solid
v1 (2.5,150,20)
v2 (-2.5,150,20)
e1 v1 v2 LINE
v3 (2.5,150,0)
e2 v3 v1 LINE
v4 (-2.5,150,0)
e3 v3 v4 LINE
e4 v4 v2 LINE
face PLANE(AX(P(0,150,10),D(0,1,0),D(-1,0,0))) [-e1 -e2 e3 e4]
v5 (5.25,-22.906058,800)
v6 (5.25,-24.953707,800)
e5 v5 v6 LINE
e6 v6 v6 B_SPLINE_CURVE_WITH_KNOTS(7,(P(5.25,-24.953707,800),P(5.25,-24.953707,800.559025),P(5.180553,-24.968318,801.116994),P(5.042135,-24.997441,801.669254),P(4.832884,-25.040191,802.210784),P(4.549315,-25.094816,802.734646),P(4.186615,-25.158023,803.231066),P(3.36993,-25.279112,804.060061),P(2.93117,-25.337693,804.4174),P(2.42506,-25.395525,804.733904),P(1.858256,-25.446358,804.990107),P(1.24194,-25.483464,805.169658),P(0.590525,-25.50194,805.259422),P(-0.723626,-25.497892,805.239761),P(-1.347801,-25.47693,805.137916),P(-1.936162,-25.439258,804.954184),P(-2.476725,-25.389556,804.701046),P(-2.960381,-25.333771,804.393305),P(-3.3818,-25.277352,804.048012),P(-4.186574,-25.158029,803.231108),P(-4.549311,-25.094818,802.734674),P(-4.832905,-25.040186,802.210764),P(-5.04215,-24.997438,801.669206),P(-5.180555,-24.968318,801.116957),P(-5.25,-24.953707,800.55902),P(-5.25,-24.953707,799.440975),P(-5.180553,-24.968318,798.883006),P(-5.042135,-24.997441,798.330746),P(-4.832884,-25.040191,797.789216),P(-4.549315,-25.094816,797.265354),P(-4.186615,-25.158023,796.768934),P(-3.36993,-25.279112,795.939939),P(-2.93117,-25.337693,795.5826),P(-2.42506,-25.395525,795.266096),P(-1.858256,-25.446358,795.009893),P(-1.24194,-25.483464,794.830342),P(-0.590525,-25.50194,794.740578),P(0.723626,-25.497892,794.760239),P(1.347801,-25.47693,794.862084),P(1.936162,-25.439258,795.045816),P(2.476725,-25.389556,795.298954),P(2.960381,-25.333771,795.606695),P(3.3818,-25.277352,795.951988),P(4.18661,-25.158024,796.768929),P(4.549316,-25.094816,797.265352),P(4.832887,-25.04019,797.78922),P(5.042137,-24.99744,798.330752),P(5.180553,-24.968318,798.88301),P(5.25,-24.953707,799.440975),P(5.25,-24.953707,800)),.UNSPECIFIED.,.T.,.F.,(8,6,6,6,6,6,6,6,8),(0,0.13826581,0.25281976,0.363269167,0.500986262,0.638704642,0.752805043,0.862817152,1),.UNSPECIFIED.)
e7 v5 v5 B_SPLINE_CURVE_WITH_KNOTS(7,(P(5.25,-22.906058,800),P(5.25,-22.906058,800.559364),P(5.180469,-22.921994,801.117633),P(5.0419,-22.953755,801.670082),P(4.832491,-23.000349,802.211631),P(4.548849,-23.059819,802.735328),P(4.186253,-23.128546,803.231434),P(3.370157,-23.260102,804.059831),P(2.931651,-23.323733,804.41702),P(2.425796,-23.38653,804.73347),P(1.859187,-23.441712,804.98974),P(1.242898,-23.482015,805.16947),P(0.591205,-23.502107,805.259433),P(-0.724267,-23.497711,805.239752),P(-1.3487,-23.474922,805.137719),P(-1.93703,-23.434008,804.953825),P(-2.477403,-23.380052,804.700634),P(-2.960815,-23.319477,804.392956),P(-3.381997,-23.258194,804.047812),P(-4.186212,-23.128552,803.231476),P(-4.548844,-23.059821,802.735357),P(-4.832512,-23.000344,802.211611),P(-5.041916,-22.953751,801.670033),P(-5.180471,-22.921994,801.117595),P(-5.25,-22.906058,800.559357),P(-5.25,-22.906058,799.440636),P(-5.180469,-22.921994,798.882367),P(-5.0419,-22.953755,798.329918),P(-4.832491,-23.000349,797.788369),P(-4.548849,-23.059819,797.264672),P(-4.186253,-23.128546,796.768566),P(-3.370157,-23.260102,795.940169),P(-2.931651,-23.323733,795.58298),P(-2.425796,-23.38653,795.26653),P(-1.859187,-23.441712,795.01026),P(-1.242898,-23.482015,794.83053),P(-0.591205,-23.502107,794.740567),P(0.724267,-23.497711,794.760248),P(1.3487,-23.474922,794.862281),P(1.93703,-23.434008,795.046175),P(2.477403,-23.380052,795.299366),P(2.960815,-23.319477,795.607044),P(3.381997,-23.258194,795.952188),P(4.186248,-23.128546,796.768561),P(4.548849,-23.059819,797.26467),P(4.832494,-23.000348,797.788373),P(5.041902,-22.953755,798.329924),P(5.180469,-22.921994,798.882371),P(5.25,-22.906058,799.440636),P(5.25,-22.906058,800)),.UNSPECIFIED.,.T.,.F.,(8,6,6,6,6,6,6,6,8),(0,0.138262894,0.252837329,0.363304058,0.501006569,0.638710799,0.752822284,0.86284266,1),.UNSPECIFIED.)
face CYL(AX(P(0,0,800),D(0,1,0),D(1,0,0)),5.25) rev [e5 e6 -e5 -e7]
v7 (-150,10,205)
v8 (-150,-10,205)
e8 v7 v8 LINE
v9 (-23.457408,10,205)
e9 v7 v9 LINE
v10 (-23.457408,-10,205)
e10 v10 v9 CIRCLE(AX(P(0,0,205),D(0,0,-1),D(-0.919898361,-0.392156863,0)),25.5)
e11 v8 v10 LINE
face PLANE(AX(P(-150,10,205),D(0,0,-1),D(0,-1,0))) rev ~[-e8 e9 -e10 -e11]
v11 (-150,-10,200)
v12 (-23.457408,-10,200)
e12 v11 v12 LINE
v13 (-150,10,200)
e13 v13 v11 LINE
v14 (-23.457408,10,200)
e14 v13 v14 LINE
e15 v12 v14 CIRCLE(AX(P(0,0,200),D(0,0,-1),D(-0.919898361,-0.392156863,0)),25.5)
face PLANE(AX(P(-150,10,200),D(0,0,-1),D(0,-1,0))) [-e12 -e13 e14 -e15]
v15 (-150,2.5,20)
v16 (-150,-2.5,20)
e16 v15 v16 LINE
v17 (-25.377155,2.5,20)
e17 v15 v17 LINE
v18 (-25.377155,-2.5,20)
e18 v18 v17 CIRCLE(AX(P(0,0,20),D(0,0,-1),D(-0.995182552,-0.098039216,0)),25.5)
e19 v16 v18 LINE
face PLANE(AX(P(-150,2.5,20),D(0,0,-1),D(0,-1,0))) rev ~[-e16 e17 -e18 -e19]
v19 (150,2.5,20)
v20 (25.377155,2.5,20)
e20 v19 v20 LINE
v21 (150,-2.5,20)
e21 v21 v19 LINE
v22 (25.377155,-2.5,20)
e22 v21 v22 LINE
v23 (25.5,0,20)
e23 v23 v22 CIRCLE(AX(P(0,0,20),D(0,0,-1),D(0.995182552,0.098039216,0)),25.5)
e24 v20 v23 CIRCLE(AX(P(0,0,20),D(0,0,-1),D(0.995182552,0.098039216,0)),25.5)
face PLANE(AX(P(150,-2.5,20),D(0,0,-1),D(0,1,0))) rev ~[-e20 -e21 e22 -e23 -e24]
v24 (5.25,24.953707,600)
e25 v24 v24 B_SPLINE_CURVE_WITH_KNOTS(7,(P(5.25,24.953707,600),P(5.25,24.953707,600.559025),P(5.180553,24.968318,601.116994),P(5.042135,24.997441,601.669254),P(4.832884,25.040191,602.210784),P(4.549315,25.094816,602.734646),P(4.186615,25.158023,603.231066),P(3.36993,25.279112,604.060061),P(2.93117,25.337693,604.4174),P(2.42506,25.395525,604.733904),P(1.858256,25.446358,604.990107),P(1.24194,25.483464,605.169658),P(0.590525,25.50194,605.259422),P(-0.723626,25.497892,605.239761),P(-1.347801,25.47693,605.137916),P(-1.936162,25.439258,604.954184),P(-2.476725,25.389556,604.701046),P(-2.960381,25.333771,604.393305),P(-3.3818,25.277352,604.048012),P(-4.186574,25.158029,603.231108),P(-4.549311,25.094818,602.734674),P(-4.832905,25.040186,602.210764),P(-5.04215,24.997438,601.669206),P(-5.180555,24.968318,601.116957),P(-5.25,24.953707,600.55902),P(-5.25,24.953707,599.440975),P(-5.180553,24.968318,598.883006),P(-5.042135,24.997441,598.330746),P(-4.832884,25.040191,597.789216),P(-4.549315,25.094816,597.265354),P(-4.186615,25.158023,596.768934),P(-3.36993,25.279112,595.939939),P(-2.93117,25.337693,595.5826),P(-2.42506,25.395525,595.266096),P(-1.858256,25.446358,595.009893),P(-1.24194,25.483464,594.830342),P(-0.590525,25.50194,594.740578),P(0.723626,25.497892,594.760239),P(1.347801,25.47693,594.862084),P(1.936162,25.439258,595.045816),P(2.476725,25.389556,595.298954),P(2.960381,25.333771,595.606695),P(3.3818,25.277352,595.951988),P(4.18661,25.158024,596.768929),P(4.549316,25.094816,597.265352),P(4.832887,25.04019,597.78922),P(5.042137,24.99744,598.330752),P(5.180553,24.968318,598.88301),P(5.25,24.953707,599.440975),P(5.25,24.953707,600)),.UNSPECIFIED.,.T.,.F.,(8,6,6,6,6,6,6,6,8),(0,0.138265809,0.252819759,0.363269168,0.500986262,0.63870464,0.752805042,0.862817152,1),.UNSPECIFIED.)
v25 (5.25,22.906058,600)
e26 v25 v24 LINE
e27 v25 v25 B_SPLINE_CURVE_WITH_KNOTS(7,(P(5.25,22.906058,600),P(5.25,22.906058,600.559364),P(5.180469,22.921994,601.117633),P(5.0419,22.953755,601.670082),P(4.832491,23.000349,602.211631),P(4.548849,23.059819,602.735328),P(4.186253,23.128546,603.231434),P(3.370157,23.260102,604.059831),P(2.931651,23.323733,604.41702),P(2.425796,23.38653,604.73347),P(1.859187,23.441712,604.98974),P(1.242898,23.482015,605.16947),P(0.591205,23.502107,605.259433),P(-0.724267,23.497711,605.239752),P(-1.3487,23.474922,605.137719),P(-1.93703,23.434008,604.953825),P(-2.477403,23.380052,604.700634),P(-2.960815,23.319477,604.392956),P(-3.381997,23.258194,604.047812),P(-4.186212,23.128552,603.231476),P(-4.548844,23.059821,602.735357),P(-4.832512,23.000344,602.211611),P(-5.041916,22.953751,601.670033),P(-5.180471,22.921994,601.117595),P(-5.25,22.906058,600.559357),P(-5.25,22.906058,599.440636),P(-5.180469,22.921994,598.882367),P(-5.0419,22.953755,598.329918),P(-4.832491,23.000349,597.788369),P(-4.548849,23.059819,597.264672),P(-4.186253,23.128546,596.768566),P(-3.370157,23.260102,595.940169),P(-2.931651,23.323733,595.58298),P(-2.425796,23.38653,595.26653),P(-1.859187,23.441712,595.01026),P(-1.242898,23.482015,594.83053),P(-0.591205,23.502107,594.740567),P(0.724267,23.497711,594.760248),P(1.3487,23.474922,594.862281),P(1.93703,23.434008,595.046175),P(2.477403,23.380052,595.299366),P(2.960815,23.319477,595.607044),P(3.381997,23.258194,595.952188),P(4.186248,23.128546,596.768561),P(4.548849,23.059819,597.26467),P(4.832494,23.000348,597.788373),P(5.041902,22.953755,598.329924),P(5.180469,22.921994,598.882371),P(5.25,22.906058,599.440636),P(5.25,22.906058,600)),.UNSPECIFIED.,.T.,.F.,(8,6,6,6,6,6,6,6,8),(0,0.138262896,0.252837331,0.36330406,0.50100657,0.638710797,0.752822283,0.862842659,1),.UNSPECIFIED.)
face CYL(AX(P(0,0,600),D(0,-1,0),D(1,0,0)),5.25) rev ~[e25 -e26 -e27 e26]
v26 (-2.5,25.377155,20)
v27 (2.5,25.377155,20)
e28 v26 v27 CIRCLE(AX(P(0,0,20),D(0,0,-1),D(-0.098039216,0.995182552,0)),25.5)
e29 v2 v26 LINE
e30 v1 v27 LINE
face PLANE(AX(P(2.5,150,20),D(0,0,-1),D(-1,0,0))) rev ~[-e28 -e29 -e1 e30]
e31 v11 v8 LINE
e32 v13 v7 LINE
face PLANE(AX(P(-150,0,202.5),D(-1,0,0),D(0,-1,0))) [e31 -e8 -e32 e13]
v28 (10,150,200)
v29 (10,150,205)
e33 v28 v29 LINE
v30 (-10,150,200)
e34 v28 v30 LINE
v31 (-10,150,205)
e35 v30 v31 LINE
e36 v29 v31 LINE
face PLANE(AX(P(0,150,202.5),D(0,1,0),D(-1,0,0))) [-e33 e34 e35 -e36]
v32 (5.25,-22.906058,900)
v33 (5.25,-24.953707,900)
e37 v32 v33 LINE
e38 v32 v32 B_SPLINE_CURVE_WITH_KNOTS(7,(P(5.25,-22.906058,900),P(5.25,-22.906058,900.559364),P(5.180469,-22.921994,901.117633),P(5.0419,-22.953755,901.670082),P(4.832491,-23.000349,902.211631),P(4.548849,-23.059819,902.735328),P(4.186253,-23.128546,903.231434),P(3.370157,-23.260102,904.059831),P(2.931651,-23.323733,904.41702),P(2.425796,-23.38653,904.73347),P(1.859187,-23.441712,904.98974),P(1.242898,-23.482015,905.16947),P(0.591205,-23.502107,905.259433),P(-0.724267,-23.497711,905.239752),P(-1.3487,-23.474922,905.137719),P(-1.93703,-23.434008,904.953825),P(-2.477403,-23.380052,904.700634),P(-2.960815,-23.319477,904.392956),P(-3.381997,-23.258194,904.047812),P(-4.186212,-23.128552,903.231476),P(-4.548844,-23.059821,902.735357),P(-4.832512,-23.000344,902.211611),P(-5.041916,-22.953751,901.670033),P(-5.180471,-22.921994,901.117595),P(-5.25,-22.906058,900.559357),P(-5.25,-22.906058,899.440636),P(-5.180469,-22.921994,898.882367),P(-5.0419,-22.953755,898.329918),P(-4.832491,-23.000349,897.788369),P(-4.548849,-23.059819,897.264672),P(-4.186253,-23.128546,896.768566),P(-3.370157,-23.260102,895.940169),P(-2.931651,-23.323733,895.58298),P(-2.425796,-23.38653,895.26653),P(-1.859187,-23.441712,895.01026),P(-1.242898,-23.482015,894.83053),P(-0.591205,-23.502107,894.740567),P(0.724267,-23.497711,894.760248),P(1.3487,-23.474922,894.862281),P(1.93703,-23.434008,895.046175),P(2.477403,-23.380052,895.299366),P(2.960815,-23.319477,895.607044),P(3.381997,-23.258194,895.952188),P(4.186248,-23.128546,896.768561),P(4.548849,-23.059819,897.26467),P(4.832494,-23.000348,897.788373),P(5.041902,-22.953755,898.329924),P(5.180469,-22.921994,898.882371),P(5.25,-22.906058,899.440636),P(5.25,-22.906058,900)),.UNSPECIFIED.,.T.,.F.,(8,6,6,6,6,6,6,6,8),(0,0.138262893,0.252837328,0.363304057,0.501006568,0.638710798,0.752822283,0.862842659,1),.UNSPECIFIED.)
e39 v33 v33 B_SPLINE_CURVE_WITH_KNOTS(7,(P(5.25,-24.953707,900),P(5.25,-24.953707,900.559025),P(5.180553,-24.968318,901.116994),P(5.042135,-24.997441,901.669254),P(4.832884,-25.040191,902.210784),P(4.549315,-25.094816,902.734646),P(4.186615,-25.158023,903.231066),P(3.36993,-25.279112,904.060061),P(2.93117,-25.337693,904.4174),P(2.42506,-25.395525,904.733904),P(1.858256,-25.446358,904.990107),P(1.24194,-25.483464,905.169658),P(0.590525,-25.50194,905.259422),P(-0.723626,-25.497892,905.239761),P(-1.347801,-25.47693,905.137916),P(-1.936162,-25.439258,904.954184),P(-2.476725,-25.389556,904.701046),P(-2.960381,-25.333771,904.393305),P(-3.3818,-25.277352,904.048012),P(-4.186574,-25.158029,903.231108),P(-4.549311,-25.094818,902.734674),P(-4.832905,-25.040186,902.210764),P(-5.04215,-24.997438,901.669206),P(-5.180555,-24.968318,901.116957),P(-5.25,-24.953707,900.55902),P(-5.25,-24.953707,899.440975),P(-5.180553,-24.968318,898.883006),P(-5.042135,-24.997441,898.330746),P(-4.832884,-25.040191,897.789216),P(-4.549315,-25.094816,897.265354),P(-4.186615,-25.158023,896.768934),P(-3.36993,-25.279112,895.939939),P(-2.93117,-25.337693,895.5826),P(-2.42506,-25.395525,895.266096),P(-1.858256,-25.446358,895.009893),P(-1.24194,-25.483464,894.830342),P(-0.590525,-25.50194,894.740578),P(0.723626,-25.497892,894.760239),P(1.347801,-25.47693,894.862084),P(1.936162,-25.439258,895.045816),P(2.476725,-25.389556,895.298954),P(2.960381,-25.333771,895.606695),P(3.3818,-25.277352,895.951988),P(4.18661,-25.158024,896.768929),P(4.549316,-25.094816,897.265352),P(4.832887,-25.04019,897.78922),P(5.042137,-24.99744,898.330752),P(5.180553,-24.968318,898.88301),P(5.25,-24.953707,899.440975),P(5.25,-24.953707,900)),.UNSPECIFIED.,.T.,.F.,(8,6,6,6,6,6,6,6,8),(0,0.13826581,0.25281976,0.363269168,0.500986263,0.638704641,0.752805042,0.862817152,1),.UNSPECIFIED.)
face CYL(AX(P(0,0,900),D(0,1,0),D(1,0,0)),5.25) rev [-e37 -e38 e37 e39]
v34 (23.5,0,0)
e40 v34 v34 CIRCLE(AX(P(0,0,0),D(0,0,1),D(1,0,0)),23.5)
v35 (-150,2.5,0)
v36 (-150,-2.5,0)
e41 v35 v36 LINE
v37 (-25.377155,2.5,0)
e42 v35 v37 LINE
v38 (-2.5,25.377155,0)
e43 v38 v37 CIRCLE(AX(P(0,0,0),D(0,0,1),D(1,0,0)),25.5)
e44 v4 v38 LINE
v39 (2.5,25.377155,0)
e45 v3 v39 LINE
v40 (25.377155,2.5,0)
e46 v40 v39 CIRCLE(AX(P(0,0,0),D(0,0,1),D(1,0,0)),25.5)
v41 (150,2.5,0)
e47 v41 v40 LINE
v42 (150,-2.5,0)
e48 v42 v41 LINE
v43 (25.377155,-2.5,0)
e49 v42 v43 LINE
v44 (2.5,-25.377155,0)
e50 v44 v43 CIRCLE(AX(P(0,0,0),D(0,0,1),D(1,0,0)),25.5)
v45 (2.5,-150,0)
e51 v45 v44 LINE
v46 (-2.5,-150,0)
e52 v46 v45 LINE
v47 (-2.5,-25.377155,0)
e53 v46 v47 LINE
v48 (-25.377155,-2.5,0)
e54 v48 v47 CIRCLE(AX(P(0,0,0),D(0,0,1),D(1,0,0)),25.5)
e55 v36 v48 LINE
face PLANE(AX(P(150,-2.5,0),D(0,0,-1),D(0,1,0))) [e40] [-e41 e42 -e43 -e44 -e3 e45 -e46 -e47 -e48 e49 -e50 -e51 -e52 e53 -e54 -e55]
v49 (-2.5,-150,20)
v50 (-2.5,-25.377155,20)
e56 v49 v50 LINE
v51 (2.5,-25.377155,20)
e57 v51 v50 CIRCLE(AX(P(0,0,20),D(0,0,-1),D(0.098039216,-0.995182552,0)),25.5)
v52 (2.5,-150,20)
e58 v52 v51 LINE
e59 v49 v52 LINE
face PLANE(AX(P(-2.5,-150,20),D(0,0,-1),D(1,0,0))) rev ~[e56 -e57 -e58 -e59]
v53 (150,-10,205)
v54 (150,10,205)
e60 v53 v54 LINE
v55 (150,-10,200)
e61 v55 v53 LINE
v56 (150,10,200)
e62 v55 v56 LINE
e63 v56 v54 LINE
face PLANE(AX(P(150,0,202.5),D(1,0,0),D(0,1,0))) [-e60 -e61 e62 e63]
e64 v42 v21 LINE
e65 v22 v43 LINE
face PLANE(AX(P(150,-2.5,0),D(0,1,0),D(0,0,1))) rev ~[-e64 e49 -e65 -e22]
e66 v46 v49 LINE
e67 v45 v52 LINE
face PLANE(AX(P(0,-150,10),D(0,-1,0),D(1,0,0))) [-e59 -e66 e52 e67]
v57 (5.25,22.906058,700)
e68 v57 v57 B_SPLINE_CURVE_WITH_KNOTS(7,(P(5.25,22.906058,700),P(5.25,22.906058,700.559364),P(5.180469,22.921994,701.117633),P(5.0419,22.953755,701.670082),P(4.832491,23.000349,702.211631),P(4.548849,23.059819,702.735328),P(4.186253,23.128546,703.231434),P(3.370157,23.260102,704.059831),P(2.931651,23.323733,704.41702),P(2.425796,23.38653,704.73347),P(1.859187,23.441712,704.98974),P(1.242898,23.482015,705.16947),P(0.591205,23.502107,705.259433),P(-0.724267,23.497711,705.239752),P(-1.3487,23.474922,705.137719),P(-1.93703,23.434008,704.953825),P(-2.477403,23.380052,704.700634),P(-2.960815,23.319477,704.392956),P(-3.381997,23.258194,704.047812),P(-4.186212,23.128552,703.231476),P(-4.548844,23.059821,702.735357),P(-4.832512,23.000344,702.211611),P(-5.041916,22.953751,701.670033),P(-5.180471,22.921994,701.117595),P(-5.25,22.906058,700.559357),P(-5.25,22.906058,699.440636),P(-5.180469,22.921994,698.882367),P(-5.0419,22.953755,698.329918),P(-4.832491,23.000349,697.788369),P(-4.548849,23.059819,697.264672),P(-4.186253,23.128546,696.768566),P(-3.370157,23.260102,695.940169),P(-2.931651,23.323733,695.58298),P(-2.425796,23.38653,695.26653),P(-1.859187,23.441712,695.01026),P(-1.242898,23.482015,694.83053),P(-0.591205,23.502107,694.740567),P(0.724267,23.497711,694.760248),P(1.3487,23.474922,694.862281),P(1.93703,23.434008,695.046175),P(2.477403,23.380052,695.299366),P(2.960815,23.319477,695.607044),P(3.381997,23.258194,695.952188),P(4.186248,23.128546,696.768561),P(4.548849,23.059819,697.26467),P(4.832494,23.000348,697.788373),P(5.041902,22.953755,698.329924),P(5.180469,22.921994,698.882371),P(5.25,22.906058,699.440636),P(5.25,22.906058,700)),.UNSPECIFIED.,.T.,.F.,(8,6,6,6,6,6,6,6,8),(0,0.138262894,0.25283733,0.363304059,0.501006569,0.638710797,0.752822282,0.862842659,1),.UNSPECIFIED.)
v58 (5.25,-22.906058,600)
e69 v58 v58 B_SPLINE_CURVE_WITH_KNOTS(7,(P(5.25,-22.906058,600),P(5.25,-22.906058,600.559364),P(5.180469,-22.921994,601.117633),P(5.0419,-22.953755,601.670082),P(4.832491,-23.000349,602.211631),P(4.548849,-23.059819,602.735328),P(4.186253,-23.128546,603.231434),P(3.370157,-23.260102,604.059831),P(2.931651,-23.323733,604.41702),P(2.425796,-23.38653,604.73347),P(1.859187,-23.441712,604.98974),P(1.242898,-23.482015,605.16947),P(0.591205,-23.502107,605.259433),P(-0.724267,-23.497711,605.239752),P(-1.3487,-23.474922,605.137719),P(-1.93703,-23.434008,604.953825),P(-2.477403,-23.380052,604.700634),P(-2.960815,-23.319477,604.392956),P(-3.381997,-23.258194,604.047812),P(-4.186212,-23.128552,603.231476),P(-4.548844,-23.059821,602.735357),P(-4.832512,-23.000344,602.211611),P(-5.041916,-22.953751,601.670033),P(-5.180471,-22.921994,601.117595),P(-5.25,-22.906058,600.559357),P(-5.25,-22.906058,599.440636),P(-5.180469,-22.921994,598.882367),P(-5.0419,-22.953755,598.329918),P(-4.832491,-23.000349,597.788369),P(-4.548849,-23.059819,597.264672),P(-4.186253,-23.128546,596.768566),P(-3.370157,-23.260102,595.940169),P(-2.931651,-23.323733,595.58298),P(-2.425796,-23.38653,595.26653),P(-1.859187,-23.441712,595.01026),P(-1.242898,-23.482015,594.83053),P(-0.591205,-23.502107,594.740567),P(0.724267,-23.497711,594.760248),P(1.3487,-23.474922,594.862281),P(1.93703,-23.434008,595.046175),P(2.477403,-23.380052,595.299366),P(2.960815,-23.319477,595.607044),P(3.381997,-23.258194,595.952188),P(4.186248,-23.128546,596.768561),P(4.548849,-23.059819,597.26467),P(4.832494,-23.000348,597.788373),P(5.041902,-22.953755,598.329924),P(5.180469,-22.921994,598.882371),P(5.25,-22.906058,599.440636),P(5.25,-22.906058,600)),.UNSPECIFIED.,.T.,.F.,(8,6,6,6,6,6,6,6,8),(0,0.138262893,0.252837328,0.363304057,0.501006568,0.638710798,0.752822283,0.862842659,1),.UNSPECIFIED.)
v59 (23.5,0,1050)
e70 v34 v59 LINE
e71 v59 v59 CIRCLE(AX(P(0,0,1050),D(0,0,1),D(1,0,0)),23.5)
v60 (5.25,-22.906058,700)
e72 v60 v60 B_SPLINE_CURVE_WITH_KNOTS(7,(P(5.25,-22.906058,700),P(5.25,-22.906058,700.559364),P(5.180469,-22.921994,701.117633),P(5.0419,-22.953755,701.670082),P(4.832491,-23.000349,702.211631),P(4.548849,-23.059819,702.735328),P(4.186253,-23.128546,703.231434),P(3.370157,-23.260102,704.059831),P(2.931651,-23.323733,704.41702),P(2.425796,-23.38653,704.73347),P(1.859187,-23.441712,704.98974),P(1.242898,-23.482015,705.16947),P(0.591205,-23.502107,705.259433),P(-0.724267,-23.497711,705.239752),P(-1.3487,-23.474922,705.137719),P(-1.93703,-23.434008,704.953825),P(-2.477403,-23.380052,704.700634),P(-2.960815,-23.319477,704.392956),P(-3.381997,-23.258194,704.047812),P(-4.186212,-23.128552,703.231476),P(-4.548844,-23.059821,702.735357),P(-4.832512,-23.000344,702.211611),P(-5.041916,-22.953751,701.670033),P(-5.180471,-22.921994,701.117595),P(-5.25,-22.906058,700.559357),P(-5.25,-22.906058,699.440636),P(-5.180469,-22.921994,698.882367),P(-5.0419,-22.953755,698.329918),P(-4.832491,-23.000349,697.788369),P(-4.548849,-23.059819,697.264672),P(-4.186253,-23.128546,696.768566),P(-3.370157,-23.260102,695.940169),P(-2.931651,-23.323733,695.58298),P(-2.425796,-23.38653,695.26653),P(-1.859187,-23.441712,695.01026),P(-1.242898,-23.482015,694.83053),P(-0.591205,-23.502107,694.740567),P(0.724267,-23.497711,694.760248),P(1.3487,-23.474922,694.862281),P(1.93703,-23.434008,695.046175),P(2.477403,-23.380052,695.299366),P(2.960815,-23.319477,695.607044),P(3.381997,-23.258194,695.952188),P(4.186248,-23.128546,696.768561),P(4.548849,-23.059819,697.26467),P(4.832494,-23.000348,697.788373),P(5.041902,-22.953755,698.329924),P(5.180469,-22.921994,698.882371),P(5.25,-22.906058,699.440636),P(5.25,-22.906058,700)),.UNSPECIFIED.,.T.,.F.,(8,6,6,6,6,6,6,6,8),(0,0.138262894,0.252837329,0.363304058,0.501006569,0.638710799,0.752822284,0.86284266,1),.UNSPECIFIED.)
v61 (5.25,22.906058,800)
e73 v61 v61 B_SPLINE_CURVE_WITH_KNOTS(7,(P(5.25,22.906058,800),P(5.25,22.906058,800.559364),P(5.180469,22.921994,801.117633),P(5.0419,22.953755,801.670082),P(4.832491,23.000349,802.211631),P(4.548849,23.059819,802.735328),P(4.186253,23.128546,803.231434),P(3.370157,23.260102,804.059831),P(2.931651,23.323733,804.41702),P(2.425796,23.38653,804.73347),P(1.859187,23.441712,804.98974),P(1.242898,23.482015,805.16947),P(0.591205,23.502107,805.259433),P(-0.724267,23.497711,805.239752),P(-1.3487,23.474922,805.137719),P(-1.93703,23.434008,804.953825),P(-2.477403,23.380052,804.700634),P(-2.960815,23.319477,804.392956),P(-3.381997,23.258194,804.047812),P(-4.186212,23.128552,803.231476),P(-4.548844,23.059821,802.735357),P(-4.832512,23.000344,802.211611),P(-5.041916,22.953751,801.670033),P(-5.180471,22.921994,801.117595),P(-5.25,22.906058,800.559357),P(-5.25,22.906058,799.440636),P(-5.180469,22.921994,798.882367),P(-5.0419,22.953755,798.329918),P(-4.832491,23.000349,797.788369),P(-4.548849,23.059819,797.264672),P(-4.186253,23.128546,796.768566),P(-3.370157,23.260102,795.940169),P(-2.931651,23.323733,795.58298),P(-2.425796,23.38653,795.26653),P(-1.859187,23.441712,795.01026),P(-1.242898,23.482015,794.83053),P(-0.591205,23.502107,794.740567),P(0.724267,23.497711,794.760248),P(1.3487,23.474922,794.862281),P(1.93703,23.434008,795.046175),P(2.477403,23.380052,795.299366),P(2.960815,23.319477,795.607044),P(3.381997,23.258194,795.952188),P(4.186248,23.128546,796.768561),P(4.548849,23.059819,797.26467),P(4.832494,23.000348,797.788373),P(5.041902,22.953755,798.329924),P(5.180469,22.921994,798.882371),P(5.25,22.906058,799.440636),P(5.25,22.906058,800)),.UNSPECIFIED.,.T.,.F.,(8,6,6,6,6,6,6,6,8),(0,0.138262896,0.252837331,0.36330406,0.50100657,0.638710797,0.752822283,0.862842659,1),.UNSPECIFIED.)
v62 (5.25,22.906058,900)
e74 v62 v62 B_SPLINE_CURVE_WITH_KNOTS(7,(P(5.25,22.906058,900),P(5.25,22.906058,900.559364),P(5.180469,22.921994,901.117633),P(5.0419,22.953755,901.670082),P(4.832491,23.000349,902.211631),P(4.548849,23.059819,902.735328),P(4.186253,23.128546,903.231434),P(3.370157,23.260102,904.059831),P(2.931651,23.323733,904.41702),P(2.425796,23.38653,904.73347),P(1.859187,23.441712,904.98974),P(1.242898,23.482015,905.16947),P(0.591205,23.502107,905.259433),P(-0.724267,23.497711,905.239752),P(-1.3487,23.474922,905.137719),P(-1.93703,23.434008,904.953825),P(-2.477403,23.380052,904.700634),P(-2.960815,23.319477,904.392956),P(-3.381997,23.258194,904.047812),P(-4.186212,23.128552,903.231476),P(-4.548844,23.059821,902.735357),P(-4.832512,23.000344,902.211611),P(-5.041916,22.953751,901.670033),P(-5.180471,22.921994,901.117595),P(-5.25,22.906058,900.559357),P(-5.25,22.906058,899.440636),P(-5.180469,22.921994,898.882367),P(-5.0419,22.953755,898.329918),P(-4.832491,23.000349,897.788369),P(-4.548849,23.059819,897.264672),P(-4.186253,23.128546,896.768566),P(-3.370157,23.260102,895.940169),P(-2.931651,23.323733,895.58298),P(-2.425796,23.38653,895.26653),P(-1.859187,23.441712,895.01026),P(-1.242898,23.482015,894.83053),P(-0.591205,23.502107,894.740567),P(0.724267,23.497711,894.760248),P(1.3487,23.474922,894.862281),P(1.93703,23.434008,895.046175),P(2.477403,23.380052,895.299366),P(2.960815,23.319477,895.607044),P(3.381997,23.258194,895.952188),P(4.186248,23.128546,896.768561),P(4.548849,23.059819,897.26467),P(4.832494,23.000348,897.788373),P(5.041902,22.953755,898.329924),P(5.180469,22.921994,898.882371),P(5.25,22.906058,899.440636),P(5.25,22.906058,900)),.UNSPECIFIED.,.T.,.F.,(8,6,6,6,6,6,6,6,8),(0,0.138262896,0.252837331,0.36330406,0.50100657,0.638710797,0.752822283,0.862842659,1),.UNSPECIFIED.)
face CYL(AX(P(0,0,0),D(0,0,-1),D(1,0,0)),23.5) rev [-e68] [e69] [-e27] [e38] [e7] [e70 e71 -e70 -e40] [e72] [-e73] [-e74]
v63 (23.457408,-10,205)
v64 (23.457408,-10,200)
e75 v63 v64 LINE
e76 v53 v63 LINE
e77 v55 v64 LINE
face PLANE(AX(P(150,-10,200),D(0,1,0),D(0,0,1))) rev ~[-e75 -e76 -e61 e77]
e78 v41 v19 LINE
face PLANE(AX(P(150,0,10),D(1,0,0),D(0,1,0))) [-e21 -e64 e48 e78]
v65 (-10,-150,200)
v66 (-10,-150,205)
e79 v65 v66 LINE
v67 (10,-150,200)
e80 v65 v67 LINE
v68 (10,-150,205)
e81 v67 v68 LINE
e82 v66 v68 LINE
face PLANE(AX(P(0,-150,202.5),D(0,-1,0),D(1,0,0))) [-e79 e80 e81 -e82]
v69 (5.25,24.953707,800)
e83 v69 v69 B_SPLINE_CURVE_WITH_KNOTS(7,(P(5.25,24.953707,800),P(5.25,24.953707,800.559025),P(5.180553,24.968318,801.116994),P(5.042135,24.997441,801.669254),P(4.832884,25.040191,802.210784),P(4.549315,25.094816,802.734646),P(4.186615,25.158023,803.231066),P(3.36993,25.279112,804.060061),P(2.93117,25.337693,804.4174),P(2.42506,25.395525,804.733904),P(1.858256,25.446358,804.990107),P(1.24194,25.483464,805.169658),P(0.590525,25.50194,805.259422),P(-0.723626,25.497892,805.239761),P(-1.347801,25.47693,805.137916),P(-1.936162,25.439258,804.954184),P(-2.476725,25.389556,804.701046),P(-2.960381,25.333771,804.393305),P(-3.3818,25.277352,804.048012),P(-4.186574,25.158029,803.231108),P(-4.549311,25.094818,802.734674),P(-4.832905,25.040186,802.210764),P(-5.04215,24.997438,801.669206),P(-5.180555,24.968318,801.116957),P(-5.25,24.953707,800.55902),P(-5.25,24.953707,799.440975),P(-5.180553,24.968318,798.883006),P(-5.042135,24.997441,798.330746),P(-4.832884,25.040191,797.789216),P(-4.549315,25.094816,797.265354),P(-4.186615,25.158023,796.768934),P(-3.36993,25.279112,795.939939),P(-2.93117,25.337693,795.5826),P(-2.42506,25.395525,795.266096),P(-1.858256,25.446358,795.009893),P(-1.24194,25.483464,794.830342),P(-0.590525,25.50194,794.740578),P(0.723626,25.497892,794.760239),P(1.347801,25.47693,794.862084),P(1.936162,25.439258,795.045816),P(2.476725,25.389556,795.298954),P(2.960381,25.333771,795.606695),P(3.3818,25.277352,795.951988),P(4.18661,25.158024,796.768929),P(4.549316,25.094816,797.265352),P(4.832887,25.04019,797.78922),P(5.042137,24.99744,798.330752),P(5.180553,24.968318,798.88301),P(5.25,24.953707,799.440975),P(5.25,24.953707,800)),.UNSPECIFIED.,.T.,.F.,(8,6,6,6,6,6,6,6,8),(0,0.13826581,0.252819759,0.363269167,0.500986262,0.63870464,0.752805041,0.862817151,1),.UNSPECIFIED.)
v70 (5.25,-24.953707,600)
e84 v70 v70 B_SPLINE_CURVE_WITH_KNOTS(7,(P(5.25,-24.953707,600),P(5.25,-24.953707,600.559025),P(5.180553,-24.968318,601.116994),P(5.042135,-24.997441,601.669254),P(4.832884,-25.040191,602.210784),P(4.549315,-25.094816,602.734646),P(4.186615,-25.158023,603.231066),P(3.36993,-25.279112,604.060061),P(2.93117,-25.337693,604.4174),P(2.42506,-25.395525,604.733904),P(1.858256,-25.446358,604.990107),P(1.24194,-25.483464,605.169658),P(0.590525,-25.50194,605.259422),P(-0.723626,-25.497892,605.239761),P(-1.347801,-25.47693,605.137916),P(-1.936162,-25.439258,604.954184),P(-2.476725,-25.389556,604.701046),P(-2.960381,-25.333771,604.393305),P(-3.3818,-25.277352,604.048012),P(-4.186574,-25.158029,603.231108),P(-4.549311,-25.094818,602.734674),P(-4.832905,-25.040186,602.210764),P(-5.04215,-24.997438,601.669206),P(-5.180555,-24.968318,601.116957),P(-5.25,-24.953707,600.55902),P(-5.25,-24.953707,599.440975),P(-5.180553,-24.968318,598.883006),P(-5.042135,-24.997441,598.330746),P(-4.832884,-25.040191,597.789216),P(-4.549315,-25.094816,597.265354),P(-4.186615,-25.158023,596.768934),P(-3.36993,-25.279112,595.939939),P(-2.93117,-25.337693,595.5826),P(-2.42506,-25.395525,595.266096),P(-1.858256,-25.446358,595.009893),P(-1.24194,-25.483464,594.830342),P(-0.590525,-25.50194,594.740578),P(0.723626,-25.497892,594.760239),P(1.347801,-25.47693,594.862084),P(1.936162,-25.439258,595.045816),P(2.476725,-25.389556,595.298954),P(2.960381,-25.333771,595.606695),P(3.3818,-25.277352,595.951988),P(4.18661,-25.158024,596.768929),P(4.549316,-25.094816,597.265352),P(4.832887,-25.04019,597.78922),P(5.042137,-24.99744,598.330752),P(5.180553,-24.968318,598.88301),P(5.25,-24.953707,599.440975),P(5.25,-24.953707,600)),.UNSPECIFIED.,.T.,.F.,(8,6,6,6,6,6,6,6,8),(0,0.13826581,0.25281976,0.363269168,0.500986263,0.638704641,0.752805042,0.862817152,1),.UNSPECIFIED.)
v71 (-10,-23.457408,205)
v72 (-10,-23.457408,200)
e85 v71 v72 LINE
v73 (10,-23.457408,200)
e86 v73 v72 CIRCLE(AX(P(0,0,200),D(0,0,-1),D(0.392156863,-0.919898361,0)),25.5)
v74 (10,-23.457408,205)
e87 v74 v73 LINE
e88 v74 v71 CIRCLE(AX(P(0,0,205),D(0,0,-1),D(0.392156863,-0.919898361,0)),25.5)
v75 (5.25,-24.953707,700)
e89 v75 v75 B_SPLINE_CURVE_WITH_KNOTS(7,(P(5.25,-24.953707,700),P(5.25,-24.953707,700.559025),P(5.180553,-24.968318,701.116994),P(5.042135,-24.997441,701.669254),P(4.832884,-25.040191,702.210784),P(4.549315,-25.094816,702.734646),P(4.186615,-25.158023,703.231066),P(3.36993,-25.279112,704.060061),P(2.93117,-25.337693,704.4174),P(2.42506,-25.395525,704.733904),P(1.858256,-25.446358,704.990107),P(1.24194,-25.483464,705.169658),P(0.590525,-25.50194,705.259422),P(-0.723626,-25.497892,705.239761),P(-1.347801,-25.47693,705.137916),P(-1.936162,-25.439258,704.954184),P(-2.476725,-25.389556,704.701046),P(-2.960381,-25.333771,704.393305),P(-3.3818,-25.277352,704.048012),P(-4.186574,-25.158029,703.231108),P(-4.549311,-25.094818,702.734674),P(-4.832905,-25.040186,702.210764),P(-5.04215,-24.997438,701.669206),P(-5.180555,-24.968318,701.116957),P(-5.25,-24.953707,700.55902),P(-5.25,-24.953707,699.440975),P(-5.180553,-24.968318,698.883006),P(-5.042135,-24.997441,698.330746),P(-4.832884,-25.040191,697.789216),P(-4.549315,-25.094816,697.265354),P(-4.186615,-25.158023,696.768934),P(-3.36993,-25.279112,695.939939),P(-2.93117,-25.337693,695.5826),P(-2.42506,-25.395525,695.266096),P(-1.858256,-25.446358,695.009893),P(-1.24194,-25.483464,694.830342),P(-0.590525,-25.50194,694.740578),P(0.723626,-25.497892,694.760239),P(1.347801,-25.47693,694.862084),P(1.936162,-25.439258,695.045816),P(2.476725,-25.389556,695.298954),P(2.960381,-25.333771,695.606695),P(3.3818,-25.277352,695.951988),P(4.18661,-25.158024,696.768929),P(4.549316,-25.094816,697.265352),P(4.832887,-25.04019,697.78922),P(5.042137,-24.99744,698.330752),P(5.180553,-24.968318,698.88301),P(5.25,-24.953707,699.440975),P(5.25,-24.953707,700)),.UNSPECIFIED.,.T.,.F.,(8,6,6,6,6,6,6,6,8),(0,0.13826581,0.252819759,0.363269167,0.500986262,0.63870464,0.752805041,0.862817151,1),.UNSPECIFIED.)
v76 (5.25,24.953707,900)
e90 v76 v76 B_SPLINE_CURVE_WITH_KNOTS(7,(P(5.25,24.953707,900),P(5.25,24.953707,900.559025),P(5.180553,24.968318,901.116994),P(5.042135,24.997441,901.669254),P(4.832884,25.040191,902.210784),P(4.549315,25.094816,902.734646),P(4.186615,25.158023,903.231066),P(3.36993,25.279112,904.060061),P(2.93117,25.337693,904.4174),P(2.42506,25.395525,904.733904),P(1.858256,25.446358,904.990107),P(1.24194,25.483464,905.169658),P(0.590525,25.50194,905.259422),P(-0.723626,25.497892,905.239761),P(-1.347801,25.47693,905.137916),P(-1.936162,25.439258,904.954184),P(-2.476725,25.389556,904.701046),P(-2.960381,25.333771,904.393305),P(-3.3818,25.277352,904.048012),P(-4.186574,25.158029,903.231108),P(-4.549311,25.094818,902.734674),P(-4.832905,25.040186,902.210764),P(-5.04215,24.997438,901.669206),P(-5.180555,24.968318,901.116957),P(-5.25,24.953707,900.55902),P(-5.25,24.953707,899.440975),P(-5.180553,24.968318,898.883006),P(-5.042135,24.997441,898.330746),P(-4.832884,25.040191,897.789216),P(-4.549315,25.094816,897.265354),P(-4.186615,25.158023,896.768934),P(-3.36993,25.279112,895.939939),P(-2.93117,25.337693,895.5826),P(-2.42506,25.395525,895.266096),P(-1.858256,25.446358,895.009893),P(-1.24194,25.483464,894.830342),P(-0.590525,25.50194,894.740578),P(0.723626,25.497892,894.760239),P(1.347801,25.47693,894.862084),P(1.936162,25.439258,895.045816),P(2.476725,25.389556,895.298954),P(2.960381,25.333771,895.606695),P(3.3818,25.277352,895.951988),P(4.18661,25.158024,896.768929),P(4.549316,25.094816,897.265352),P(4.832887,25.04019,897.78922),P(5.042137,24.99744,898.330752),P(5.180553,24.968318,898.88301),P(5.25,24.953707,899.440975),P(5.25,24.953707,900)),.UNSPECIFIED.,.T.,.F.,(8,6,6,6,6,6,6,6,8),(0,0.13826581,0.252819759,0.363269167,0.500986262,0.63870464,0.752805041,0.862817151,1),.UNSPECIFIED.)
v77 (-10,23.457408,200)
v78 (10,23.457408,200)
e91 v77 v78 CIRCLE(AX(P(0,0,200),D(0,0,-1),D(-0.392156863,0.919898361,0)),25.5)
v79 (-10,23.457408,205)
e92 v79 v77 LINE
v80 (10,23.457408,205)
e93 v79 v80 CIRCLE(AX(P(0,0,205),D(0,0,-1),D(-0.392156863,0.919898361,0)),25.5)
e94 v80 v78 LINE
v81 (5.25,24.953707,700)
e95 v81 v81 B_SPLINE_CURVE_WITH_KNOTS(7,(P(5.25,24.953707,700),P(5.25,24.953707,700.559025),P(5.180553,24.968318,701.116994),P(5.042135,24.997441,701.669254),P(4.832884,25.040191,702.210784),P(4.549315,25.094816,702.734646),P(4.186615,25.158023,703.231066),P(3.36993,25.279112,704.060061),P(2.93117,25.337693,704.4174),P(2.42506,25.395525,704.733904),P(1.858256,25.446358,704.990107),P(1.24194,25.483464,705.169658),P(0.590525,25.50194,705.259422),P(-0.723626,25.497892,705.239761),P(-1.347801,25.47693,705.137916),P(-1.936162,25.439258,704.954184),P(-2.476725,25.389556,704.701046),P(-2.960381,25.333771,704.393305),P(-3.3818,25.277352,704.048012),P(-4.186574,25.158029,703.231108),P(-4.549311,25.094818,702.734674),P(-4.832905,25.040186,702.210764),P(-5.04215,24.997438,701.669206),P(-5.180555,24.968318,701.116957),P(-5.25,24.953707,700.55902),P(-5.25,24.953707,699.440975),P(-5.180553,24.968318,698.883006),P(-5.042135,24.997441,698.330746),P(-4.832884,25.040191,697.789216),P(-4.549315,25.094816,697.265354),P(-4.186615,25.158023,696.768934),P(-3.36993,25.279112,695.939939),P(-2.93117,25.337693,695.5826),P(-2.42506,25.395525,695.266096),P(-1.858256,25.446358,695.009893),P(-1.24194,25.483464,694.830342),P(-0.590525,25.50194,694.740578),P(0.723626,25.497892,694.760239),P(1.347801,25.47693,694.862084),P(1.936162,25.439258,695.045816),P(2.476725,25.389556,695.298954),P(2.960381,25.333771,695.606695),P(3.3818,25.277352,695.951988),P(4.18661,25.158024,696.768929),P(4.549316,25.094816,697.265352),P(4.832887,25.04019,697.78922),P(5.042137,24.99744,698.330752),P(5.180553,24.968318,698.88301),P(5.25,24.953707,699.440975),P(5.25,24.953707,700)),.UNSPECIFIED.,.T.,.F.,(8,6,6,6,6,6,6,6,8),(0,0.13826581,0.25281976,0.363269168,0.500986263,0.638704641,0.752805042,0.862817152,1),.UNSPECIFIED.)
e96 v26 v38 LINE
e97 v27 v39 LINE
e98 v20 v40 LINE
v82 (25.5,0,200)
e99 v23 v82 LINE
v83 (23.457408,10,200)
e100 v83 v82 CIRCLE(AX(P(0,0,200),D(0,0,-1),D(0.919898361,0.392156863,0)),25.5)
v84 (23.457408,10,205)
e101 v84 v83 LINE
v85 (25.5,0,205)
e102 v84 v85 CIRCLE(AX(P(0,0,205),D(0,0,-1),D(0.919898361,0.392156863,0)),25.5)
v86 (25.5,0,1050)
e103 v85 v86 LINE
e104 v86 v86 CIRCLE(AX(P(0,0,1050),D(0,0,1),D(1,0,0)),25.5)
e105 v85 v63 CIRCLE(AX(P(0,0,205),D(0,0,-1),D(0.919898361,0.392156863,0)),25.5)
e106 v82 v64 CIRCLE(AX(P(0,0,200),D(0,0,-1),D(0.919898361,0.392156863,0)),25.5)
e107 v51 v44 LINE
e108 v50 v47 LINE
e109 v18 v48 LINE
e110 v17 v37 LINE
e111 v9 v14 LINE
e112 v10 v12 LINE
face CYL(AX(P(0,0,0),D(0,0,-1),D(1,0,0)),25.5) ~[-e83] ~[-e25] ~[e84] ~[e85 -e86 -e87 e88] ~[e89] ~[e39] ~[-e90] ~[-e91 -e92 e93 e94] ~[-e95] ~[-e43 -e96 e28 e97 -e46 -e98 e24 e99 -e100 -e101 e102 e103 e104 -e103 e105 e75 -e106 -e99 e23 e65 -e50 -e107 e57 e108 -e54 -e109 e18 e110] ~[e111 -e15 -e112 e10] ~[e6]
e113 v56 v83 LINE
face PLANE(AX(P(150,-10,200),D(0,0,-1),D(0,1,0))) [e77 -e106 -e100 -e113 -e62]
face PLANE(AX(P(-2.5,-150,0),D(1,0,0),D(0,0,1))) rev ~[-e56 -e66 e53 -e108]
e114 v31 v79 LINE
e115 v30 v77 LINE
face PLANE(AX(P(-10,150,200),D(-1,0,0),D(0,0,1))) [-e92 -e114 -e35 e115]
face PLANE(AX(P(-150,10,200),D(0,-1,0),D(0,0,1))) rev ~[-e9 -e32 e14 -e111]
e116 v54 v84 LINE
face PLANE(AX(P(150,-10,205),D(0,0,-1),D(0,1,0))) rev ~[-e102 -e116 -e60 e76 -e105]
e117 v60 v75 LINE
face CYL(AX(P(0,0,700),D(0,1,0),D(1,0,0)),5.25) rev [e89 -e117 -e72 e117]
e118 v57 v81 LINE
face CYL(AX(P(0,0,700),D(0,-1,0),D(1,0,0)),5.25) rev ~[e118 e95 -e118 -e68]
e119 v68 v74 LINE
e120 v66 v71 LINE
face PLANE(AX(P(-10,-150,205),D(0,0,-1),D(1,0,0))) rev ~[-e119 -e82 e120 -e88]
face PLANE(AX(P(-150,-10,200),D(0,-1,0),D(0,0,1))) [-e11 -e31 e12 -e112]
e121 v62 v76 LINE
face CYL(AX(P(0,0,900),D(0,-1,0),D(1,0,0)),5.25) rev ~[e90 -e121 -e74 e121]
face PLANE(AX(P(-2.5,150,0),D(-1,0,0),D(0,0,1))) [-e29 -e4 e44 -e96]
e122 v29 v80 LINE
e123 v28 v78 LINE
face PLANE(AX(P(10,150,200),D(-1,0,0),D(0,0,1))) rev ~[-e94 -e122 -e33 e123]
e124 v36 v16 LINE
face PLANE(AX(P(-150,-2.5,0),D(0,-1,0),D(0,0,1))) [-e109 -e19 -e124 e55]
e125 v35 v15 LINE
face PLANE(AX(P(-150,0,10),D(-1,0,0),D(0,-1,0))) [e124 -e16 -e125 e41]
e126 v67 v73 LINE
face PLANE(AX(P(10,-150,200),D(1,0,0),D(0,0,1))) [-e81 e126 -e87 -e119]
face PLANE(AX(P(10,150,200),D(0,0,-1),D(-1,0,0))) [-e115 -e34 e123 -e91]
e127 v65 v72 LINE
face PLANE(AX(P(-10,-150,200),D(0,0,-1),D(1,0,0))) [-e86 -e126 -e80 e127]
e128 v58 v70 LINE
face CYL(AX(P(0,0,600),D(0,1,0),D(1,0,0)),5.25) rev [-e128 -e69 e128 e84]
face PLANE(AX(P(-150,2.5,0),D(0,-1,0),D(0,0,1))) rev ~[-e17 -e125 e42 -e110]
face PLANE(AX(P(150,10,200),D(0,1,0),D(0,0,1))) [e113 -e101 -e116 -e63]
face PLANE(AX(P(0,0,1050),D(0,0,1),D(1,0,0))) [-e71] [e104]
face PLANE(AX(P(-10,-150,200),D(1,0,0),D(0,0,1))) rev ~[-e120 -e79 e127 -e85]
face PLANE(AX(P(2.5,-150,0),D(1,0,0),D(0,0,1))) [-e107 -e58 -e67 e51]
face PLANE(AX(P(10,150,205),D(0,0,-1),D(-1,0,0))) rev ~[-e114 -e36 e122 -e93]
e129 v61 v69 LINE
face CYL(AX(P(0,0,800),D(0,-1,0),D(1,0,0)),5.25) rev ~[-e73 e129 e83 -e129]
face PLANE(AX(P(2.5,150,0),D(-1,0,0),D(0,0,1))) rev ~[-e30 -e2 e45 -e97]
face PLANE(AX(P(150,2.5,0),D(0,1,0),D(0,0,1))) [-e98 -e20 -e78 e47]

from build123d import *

# Parameters (mm, degrees)
F0_R            = 25.5
F0_R_2          = 23.5
F1_DEPTH        = 1050
F3_W            = 5
F3_H            = 20
F3_W_2          = 20
F3_H_2          = 5
F4_COPIES_COUNT = 4
F5_R            = 5.25
F6_DEPTH        = 150.001
F6_DEPTH_BACK   = 150.001


# Not quite as in the source:
# - a pattern or mirror of a feature is missing from the dataset's text; its kind, count and spacing are read off the source's solid


with BuildPart() as f1:
    # F0 (on Top) → F1 (new body)
    with BuildSketch(Plane.XY):
        Circle(F0_R)
        Circle(F0_R_2, mode=Mode.SUBTRACT)
    extrude(amount=F1_DEPTH)

    # F3 (on offset) → F4 (join, up to the next surface of F1)
    with BuildSketch(Plane.YZ.offset(150)):
        with Locations((0, 10)):
            Rectangle(F3_W, F3_H)
        with Locations((0, 202.5)):
            Rectangle(F3_W_2, F3_H_2)
    f4 = extrude(until=Until.NEXT, dir=(-1, 0, 0))

    # F4_copies: F4 ×4 about axis
    f4_copies_axis = Axis((0, 0, 0), (0, 0, 1))
    for i in range(1, F4_COPIES_COUNT):
        add(f4.rotate(f4_copies_axis, i * 360 / F4_COPIES_COUNT))

    # F5 (on Front) → F6 (cut, two sides)
    with BuildSketch(Plane.XZ) as f6_sk:
        with Locations((0, 600)):
            Circle(F5_R)
        with Locations((0, 700)):
            Circle(F5_R)
        with Locations((0, 800)):
            Circle(F5_R)
        with Locations((0, 900)):
            Circle(F5_R)
    extrude(amount=-F6_DEPTH, mode=Mode.SUBTRACT)
    extrude(f6_sk.sketch, amount=F6_DEPTH_BACK, mode=Mode.SUBTRACT)


solid = f1.part
